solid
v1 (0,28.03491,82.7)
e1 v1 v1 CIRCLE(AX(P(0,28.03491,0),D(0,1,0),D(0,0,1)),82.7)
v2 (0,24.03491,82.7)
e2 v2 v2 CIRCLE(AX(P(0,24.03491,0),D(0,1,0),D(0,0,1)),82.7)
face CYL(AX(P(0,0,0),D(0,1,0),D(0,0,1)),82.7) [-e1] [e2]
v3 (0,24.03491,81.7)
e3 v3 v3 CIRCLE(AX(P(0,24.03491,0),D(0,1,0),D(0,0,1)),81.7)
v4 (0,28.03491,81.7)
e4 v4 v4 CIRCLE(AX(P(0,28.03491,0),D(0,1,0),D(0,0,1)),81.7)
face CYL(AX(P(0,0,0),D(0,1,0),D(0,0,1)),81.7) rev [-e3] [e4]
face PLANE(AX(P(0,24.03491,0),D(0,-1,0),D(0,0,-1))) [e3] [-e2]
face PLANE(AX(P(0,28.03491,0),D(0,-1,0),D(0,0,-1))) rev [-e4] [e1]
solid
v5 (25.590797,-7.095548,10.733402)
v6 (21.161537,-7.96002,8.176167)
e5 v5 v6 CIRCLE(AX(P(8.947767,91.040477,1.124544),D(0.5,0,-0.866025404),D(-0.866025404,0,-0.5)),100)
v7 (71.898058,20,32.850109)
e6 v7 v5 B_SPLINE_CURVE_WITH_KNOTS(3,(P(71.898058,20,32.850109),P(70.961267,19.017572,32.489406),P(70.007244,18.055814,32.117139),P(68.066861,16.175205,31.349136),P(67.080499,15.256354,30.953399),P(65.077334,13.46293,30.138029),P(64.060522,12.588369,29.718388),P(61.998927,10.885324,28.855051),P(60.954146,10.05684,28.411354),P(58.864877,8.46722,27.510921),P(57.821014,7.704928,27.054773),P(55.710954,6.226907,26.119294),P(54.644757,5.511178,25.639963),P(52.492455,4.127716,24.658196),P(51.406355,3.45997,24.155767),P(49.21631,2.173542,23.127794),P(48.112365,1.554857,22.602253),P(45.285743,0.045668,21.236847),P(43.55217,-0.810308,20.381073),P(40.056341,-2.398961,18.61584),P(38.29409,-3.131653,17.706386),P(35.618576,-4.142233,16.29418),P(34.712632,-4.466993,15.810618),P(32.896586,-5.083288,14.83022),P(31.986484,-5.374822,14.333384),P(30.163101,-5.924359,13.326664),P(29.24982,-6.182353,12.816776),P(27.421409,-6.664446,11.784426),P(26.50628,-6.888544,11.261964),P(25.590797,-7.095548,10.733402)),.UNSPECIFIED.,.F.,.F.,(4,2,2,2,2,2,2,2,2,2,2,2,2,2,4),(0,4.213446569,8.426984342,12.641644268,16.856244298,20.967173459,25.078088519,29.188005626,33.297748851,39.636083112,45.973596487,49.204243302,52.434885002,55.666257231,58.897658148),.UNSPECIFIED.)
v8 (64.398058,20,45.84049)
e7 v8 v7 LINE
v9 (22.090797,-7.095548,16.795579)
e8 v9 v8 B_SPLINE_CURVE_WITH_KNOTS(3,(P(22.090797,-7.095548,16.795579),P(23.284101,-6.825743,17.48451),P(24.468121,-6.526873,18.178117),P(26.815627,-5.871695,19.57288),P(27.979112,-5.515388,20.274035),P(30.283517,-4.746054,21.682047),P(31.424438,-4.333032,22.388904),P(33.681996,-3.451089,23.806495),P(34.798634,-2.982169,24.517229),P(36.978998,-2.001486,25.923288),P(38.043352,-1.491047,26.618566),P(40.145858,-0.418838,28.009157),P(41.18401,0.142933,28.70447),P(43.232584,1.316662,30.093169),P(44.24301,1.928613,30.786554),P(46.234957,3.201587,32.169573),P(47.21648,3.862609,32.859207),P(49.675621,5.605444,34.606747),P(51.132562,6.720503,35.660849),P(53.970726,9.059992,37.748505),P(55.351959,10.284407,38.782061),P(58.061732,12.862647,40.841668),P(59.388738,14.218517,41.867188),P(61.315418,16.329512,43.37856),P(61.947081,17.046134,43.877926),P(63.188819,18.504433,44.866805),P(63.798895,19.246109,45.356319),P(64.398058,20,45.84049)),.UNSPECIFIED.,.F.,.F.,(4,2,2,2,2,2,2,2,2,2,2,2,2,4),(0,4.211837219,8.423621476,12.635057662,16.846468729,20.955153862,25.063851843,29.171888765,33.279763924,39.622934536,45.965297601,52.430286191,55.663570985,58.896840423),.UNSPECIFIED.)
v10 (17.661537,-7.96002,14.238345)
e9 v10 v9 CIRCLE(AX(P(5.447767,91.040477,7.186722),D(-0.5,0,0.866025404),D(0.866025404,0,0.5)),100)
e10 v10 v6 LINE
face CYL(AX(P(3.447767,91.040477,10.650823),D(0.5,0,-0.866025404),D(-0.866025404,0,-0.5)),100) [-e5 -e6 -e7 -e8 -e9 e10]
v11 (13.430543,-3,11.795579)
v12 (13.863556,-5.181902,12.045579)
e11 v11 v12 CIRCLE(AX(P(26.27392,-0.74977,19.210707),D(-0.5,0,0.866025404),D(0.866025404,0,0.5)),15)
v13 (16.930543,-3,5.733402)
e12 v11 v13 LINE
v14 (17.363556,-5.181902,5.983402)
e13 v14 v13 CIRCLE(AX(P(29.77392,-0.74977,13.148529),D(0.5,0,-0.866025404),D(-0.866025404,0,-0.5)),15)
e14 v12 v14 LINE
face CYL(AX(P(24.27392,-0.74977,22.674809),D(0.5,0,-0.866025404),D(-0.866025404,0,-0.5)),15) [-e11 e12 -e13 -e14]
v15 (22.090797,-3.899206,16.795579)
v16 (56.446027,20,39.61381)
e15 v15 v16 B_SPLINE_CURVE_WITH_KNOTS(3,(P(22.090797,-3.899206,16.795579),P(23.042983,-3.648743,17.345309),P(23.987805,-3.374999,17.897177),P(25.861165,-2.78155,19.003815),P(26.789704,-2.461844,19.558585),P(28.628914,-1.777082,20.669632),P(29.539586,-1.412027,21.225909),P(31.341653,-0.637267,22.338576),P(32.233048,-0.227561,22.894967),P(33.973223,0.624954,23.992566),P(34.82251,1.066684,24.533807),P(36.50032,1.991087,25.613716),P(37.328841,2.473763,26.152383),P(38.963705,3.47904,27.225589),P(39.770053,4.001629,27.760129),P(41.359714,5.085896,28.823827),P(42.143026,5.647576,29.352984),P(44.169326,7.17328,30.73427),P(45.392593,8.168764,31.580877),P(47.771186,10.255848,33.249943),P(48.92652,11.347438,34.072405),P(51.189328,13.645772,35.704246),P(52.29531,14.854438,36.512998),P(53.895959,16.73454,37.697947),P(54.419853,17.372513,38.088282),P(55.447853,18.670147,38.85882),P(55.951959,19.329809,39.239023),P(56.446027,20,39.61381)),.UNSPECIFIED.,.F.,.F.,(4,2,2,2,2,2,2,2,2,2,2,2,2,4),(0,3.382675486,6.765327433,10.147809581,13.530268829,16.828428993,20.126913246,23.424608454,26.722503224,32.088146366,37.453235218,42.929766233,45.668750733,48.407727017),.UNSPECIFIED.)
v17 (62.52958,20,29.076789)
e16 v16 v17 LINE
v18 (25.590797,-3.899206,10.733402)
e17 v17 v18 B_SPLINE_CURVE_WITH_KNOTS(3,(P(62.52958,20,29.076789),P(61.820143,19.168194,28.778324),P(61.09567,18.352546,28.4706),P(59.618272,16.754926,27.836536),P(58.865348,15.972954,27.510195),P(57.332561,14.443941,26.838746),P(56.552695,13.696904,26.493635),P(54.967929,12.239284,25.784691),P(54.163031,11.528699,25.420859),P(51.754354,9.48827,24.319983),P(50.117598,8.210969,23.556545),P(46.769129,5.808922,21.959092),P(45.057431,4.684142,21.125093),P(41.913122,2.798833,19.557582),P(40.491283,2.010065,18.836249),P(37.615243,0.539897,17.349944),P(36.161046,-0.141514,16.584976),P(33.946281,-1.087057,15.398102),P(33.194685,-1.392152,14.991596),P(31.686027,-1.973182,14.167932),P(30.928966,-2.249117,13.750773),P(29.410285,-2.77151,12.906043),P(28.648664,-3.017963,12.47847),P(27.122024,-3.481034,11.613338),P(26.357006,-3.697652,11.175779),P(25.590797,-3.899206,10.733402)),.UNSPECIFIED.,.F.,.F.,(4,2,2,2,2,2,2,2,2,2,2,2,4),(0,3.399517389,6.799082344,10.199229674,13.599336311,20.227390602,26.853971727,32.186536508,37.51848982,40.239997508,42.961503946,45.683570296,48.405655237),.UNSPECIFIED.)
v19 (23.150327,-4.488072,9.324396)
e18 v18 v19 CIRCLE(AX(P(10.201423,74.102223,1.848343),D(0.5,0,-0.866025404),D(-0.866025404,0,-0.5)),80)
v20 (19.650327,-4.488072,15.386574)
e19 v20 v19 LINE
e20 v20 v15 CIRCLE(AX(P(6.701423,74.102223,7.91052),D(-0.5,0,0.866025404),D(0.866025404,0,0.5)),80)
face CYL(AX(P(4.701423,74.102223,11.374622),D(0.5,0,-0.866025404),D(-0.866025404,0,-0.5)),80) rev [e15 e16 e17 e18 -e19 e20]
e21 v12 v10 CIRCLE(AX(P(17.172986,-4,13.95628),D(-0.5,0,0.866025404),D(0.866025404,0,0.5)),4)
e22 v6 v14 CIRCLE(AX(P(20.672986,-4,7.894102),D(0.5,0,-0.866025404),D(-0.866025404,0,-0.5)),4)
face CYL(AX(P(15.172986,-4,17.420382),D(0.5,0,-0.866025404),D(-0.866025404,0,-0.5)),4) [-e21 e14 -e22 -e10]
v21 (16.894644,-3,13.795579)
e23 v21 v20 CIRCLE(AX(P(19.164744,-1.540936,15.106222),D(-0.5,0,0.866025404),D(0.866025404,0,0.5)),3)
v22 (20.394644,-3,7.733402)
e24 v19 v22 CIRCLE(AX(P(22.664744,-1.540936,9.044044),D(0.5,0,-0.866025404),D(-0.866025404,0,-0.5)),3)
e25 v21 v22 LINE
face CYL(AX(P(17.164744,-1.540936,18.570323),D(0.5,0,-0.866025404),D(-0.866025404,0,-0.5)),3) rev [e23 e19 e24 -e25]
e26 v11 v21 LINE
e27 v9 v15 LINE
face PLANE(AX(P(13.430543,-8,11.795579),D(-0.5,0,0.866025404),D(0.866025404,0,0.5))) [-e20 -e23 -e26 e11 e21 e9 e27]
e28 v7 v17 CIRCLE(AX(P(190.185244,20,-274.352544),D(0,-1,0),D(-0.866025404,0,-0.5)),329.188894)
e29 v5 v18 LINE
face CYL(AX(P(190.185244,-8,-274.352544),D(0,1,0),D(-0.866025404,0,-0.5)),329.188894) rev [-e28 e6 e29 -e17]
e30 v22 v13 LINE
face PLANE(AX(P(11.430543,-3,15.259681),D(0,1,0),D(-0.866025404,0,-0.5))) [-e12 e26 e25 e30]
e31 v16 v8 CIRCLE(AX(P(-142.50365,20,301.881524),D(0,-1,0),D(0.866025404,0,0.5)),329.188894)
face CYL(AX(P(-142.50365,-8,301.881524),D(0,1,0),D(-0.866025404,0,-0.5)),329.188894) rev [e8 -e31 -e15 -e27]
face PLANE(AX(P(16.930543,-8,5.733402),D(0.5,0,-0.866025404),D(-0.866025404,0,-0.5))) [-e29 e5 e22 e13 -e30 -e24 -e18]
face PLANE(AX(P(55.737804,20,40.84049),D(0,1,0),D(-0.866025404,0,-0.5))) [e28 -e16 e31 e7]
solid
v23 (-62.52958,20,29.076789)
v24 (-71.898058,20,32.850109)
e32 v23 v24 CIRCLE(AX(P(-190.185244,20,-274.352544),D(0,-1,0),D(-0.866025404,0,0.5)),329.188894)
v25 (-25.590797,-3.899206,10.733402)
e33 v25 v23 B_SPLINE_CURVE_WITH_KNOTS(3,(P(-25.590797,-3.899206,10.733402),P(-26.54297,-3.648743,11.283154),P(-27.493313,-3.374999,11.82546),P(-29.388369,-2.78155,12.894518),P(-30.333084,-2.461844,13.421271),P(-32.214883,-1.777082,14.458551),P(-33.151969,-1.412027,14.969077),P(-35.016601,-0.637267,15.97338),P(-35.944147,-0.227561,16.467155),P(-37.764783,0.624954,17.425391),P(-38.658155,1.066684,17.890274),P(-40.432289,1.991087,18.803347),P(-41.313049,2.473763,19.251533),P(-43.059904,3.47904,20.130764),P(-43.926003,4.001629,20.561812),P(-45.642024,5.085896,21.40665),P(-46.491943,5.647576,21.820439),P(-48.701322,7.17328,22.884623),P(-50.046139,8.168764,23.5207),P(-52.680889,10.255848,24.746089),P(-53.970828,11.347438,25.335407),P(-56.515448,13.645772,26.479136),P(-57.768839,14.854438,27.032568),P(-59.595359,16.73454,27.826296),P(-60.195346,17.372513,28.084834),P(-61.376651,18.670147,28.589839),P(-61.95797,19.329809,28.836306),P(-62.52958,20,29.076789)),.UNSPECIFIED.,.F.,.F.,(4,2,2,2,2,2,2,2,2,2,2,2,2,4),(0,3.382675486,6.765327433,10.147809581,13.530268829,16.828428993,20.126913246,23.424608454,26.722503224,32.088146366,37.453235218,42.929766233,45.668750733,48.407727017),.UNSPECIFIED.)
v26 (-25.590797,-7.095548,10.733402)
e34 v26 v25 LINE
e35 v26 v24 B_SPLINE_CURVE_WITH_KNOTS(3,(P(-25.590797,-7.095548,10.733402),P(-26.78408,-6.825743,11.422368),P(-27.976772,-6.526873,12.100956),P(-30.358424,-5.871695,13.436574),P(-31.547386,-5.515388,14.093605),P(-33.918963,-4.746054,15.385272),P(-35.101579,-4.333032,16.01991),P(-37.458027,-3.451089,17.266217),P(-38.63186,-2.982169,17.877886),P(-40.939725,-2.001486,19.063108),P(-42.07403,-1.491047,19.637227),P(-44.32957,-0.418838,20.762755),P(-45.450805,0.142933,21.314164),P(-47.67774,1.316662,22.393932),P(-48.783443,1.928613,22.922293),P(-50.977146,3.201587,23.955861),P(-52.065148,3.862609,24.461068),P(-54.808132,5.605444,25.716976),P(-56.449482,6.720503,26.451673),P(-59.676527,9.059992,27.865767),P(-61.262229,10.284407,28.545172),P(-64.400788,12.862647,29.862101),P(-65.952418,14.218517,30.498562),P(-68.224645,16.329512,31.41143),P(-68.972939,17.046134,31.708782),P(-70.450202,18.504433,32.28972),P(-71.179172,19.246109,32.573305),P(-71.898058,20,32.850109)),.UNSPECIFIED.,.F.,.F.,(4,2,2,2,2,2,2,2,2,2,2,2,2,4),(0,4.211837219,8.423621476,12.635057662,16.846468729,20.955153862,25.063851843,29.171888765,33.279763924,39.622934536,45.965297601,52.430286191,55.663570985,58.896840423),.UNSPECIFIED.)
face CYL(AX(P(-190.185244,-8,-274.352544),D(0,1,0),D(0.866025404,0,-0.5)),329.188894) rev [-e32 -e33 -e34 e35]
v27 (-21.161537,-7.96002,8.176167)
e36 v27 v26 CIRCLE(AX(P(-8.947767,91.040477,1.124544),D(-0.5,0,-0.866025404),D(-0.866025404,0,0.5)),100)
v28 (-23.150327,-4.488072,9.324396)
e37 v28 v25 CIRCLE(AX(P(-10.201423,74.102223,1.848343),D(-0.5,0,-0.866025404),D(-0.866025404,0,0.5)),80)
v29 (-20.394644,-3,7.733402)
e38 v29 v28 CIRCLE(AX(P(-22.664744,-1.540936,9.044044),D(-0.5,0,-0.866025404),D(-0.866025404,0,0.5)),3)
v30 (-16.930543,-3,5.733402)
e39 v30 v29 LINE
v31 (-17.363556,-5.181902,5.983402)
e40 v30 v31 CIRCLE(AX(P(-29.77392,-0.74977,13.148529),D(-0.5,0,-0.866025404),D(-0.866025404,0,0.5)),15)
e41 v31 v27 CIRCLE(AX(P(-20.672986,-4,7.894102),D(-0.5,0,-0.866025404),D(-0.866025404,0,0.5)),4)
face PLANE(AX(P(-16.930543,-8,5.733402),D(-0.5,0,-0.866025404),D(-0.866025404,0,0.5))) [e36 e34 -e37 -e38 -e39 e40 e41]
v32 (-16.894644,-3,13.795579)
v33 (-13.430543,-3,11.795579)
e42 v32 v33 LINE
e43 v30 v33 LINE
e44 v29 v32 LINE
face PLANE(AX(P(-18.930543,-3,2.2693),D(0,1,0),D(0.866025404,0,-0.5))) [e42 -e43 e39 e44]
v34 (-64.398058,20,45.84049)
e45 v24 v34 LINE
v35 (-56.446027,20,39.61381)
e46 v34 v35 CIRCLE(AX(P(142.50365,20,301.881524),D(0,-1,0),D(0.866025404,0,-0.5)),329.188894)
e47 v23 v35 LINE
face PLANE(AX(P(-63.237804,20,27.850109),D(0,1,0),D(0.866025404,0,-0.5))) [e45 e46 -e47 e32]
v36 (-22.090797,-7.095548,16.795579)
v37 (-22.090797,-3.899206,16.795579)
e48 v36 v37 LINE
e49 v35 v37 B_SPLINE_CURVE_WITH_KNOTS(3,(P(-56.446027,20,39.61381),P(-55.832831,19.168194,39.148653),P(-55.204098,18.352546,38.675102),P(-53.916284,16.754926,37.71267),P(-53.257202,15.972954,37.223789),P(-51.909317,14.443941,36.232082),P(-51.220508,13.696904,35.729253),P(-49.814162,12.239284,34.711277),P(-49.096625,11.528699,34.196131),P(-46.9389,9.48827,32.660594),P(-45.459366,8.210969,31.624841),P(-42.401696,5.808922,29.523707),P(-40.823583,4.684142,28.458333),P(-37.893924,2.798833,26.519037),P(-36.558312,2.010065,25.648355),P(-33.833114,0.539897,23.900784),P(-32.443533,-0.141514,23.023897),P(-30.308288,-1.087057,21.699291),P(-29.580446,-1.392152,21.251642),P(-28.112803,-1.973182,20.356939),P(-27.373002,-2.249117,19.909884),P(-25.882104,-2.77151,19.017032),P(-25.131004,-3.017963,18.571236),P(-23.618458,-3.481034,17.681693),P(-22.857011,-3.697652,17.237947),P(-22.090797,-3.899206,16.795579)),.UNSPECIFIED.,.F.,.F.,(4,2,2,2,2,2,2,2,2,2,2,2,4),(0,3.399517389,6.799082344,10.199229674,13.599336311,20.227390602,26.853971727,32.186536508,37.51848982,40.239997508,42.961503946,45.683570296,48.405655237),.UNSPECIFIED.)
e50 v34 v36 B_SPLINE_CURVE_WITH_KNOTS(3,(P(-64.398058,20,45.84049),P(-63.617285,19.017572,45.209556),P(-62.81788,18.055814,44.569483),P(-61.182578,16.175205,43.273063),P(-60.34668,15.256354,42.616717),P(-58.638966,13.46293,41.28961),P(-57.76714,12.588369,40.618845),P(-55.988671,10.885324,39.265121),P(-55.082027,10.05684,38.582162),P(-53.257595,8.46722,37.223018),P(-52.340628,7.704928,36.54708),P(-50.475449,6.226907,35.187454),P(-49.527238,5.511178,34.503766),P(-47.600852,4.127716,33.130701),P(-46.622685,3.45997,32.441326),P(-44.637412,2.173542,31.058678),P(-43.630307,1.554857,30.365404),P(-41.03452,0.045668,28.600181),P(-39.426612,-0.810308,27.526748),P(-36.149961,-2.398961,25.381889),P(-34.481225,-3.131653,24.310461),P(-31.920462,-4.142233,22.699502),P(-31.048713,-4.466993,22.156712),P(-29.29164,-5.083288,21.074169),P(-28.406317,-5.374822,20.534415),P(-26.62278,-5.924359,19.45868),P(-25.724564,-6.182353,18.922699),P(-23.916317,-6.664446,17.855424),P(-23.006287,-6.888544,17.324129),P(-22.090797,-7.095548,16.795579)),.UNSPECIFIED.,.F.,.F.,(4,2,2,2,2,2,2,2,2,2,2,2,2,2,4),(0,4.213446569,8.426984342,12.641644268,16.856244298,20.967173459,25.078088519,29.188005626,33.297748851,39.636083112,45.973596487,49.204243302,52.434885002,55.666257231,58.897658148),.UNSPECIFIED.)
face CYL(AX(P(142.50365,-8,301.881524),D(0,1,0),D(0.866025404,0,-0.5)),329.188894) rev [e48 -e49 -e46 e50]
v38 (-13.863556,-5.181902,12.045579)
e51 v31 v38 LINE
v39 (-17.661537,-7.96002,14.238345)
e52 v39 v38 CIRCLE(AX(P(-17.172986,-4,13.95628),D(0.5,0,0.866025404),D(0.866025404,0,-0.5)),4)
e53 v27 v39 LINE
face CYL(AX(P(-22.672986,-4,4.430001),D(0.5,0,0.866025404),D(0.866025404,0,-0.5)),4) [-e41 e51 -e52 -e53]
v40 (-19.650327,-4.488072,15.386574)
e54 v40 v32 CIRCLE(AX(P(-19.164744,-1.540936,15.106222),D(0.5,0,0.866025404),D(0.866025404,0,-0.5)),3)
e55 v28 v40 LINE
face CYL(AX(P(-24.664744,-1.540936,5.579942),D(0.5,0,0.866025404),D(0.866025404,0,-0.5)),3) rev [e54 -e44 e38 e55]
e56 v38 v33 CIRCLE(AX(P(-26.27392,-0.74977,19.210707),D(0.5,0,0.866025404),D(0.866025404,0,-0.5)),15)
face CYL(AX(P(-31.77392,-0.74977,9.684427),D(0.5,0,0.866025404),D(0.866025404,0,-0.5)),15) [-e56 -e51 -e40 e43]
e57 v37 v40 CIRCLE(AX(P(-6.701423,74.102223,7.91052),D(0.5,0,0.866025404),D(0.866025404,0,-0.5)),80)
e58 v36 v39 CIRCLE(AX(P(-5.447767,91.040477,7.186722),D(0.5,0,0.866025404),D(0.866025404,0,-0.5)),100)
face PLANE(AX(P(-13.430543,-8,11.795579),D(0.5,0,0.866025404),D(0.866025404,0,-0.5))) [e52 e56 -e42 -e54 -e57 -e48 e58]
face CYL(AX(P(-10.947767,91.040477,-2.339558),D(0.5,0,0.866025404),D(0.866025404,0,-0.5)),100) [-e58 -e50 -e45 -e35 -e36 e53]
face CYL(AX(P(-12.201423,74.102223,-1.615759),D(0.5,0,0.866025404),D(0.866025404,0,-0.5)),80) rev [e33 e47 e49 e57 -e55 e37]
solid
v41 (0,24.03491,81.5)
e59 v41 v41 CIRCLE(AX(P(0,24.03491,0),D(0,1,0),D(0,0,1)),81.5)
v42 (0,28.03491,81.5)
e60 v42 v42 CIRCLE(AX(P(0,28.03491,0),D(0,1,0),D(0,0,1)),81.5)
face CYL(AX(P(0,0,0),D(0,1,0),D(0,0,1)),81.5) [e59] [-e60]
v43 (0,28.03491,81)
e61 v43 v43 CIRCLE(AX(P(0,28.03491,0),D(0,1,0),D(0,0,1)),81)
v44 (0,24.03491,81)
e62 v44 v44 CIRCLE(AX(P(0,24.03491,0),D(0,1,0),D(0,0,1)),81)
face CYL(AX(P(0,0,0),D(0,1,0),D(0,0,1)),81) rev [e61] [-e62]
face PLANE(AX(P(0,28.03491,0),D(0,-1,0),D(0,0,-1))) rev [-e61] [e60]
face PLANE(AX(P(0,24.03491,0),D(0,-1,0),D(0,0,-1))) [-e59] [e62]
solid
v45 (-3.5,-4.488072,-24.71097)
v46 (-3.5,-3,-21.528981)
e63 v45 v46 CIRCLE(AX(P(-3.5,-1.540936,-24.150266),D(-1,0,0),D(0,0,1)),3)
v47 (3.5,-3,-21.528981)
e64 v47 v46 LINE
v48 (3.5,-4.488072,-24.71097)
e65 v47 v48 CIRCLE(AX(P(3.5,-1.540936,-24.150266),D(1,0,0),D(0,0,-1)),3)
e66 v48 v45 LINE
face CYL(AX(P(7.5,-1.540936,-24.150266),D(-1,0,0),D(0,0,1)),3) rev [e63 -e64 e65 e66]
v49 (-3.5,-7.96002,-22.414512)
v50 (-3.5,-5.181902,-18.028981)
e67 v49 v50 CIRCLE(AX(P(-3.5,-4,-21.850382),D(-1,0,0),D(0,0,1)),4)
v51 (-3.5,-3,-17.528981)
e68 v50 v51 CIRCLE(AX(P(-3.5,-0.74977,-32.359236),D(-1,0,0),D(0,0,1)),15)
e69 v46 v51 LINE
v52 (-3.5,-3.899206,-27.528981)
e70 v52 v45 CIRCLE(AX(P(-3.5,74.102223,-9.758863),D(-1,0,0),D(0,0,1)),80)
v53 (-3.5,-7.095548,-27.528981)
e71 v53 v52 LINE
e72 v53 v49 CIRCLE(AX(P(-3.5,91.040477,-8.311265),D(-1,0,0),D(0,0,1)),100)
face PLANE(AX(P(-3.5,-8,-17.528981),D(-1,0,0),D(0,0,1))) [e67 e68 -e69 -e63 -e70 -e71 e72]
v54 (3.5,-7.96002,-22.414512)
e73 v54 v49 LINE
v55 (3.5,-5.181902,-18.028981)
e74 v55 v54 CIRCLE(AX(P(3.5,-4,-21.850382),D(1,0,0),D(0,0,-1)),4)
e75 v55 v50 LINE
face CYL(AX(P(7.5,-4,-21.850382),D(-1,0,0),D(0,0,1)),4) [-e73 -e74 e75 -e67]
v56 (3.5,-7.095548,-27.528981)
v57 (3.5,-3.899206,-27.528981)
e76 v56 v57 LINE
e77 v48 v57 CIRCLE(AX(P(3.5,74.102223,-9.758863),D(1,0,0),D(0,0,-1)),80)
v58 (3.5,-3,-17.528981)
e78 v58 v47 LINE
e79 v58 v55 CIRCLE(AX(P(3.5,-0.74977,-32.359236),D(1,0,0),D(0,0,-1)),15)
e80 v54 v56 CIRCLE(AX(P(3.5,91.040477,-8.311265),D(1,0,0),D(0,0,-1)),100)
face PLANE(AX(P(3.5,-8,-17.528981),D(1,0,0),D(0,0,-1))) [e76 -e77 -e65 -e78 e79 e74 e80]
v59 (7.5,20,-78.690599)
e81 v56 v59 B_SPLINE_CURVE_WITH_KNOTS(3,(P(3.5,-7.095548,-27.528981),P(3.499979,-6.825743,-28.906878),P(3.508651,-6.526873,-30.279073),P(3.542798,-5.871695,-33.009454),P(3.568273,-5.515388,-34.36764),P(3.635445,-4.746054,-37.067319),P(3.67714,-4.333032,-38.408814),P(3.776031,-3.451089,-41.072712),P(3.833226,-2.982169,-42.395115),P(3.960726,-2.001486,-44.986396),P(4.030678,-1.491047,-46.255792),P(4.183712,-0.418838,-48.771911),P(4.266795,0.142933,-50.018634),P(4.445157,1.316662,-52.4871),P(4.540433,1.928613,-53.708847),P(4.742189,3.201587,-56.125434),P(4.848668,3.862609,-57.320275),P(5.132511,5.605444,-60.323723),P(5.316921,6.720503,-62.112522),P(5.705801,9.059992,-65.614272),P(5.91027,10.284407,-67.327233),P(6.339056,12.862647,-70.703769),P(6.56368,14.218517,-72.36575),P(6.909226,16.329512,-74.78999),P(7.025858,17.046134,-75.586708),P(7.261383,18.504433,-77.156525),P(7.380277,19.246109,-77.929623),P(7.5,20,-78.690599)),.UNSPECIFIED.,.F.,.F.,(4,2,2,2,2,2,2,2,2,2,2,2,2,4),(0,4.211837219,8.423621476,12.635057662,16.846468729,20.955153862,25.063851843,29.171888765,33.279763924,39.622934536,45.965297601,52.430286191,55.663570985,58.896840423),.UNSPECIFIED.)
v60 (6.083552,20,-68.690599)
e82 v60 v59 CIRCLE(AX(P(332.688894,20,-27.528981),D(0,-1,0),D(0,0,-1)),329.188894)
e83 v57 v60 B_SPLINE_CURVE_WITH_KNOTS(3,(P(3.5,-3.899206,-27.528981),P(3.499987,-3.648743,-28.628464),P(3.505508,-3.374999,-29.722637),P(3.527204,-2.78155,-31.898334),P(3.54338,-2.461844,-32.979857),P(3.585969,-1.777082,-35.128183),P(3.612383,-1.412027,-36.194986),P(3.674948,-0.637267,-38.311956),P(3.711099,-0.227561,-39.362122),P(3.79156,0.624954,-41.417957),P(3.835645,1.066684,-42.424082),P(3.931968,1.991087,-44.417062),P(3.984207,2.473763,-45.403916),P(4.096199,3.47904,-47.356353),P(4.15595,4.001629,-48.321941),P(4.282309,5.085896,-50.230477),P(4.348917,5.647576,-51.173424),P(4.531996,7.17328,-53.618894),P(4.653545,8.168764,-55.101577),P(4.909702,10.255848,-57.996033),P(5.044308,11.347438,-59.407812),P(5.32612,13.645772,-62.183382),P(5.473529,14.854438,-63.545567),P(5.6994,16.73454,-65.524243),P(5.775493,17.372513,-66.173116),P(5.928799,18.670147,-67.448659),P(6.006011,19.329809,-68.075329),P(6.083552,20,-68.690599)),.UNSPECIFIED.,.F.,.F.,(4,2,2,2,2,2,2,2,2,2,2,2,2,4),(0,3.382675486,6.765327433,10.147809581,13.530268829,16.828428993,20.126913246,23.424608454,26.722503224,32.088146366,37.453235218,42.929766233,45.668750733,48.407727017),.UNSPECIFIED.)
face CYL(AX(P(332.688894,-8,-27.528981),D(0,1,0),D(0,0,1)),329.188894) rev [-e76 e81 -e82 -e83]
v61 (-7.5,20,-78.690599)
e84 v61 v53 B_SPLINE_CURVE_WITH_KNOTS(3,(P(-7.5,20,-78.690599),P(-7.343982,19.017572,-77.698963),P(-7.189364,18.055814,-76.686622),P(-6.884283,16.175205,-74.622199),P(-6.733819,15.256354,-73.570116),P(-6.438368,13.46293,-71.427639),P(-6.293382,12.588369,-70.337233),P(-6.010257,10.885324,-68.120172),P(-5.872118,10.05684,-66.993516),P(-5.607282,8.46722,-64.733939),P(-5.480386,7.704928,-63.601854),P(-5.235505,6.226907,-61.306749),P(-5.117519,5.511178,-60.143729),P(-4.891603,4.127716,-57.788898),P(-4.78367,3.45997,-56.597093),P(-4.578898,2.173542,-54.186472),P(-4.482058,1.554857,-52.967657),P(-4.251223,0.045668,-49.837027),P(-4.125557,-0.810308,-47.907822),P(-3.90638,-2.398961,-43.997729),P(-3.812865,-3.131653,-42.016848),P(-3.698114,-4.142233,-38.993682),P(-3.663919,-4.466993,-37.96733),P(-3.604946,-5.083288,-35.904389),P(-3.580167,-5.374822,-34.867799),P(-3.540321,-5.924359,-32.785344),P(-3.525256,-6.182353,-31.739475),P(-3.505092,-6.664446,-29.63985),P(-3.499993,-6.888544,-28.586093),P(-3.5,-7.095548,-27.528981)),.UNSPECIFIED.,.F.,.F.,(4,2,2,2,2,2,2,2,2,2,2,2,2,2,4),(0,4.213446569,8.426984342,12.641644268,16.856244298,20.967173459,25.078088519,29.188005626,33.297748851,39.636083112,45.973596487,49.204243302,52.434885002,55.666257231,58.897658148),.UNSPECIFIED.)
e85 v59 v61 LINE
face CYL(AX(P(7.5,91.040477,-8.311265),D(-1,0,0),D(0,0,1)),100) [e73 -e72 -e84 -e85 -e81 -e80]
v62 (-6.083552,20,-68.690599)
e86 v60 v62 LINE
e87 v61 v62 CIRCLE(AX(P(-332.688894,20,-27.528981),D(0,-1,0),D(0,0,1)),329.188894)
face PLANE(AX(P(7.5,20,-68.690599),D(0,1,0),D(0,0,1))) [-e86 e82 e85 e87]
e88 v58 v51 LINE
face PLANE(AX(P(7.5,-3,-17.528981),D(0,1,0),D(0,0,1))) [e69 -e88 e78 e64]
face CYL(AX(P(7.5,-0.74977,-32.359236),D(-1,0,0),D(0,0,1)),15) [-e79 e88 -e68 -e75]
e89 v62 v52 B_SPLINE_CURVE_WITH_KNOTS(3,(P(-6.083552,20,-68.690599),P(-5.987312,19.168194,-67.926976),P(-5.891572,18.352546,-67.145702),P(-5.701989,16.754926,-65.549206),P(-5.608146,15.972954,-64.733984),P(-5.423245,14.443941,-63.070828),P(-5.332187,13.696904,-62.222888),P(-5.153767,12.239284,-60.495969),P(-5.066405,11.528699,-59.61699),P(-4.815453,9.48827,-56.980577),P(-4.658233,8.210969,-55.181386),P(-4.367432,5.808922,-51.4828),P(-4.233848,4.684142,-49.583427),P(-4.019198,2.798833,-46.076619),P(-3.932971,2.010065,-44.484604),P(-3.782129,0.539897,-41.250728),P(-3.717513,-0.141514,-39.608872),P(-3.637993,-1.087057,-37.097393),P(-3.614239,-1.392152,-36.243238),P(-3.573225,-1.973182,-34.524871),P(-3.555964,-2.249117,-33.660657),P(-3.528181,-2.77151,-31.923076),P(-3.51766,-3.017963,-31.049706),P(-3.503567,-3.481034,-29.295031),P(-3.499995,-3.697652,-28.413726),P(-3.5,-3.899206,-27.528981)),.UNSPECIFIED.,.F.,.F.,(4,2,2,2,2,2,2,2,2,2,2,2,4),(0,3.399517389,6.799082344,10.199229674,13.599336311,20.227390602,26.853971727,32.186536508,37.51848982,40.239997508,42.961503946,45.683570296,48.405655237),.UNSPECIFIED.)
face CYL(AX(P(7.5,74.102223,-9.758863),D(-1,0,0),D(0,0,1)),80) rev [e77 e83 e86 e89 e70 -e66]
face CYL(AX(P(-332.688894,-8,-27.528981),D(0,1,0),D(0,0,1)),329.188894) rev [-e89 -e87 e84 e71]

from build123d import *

# Parameters (mm, degrees)
BOSS_EXTRUDE1_START     = -7.5
BOSS_EXTRUDE1_DEPTH     = 15
CUT_EXTRUDE1_DEPTH      = 82.53809146
CUT_EXTRUDE1_DEPTH_BACK = 82.53809146
SKETCH19_OUTSIDE_W      = 30.784
SKETCH19_OUTSIDE_H      = 76.946
CIRPATTERN3_COUNT       = 3
THICKEN1_START          = 24.03491013
THICKEN1_OUTLINE_R      = 81.5
THICKEN1_OUTLINE_R_2    = 81
THICKEN1_DEPTH          = 4
THICKEN2_START          = 24.03491013
THICKEN2_OUTLINE_R      = 82.7
THICKEN2_OUTLINE_R_2    = 81.7
THICKEN2_DEPTH          = 4


with BuildPart() as part:
    # Boss-Extrude1: read off the stored shape, not the designer's step
    # Boss-Extrude1 outline → Boss-Extrude1 (new body)
    with BuildSketch(Plane(origin=(0, 0, 0), x_dir=(0, 0, -1), z_dir=(1, 0, 0)).offset(BOSS_EXTRUDE1_START)):
        with BuildLine():
            ThreePointArc((18.028980942, -5.181901708), (19.709835751, -7.379062069), (22.414512175, -7.960019885))
            ThreePointArc((22.414512175, -7.960019885), (52.80584115, 1.484725187), (78.690598923, 20))
            Line((78.690598923, 20), (68.690598923, 20))
            ThreePointArc((68.690598923, 20), (48.677007473, 4.206743456), (24.710969586, -4.488072412))
            ThreePointArc((24.710969586, -4.488072412), (22.879404453, -4.258455788), (21.528980942, -3))
            Line((21.528980942, -3), (17.528980942, -3))
            ThreePointArc((17.528980942, -3), (17.738223336, -4.100290781), (18.028980942, -5.181901708))
        make_face()
    extrude(amount=BOSS_EXTRUDE1_DEPTH)

    # Sketch19 outside → Cut-Extrude1 (cut, two sides: drawn at the far end of the back side and taken through both)
    with BuildSketch(Plane(origin=(0, 0, 0), x_dir=(1, 0, 0), z_dir=(0, 1, 0)).offset(-CUT_EXTRUDE1_DEPTH_BACK)):
        with Locations((0, 48.11)):
            Rectangle(SKETCH19_OUTSIDE_W, SKETCH19_OUTSIDE_H)
        with BuildLine():
            Line((-3.5, 17.528980942), (-3.5, 27.528980942))
            ThreePointArc((-3.5, 27.528980942), (-4.501523516, 53.187854429), (-7.5, 78.690598923))
            Line((-7.5, 78.690598923), (7.5, 78.690598923))
            ThreePointArc((7.5, 78.690598923), (4.501523516, 53.187854429), (3.5, 27.528980942))
            Line((3.5, 27.528980942), (3.5, 17.528980942))
            Line((3.5, 17.528980942), (-3.5, 17.528980942))
        make_face(mode=Mode.SUBTRACT)
    extrude(amount=CUT_EXTRUDE1_DEPTH + CUT_EXTRUDE1_DEPTH_BACK, mode=Mode.SUBTRACT)


with BuildPart() as cirpattern3_1:
    # CirPattern3: pattern copy
    add(part.part.rotate(Axis((0, 0, 0), (0, 1, 0)), 1 * 360 / CIRPATTERN3_COUNT))


with BuildPart() as cirpattern3_2:
    # CirPattern3: pattern copy
    add(part.part.rotate(Axis((0, 0, 0), (0, 1, 0)), 2 * 360 / CIRPATTERN3_COUNT))


with BuildPart() as body_4:
    # Thicken1: read off the stored shape, not the designer's step
    # Thicken1 outline → Thicken1 (new body)
    with BuildSketch(Plane(origin=(0, 0, 0), x_dir=(1, 0, 0), z_dir=(0, 1, 0)).offset(THICKEN1_START)):
        Circle(THICKEN1_OUTLINE_R)
        Circle(THICKEN1_OUTLINE_R_2, mode=Mode.SUBTRACT)
    extrude(amount=THICKEN1_DEPTH)


with BuildPart() as body_5:
    # Thicken2: read off the stored shape, not the designer's step
    # Thicken2 outline → Thicken2 (new body)
    with BuildSketch(Plane(origin=(0, 0, 0), x_dir=(1, 0, 0), z_dir=(0, 1, 0)).offset(THICKEN2_START)):
        Circle(THICKEN2_OUTLINE_R)
        Circle(THICKEN2_OUTLINE_R_2, mode=Mode.SUBTRACT)
    extrude(amount=THICKEN2_DEPTH)


solid = Compound([part.part, cirpattern3_1.part, cirpattern3_2.part, body_4.part, body_5.part])
